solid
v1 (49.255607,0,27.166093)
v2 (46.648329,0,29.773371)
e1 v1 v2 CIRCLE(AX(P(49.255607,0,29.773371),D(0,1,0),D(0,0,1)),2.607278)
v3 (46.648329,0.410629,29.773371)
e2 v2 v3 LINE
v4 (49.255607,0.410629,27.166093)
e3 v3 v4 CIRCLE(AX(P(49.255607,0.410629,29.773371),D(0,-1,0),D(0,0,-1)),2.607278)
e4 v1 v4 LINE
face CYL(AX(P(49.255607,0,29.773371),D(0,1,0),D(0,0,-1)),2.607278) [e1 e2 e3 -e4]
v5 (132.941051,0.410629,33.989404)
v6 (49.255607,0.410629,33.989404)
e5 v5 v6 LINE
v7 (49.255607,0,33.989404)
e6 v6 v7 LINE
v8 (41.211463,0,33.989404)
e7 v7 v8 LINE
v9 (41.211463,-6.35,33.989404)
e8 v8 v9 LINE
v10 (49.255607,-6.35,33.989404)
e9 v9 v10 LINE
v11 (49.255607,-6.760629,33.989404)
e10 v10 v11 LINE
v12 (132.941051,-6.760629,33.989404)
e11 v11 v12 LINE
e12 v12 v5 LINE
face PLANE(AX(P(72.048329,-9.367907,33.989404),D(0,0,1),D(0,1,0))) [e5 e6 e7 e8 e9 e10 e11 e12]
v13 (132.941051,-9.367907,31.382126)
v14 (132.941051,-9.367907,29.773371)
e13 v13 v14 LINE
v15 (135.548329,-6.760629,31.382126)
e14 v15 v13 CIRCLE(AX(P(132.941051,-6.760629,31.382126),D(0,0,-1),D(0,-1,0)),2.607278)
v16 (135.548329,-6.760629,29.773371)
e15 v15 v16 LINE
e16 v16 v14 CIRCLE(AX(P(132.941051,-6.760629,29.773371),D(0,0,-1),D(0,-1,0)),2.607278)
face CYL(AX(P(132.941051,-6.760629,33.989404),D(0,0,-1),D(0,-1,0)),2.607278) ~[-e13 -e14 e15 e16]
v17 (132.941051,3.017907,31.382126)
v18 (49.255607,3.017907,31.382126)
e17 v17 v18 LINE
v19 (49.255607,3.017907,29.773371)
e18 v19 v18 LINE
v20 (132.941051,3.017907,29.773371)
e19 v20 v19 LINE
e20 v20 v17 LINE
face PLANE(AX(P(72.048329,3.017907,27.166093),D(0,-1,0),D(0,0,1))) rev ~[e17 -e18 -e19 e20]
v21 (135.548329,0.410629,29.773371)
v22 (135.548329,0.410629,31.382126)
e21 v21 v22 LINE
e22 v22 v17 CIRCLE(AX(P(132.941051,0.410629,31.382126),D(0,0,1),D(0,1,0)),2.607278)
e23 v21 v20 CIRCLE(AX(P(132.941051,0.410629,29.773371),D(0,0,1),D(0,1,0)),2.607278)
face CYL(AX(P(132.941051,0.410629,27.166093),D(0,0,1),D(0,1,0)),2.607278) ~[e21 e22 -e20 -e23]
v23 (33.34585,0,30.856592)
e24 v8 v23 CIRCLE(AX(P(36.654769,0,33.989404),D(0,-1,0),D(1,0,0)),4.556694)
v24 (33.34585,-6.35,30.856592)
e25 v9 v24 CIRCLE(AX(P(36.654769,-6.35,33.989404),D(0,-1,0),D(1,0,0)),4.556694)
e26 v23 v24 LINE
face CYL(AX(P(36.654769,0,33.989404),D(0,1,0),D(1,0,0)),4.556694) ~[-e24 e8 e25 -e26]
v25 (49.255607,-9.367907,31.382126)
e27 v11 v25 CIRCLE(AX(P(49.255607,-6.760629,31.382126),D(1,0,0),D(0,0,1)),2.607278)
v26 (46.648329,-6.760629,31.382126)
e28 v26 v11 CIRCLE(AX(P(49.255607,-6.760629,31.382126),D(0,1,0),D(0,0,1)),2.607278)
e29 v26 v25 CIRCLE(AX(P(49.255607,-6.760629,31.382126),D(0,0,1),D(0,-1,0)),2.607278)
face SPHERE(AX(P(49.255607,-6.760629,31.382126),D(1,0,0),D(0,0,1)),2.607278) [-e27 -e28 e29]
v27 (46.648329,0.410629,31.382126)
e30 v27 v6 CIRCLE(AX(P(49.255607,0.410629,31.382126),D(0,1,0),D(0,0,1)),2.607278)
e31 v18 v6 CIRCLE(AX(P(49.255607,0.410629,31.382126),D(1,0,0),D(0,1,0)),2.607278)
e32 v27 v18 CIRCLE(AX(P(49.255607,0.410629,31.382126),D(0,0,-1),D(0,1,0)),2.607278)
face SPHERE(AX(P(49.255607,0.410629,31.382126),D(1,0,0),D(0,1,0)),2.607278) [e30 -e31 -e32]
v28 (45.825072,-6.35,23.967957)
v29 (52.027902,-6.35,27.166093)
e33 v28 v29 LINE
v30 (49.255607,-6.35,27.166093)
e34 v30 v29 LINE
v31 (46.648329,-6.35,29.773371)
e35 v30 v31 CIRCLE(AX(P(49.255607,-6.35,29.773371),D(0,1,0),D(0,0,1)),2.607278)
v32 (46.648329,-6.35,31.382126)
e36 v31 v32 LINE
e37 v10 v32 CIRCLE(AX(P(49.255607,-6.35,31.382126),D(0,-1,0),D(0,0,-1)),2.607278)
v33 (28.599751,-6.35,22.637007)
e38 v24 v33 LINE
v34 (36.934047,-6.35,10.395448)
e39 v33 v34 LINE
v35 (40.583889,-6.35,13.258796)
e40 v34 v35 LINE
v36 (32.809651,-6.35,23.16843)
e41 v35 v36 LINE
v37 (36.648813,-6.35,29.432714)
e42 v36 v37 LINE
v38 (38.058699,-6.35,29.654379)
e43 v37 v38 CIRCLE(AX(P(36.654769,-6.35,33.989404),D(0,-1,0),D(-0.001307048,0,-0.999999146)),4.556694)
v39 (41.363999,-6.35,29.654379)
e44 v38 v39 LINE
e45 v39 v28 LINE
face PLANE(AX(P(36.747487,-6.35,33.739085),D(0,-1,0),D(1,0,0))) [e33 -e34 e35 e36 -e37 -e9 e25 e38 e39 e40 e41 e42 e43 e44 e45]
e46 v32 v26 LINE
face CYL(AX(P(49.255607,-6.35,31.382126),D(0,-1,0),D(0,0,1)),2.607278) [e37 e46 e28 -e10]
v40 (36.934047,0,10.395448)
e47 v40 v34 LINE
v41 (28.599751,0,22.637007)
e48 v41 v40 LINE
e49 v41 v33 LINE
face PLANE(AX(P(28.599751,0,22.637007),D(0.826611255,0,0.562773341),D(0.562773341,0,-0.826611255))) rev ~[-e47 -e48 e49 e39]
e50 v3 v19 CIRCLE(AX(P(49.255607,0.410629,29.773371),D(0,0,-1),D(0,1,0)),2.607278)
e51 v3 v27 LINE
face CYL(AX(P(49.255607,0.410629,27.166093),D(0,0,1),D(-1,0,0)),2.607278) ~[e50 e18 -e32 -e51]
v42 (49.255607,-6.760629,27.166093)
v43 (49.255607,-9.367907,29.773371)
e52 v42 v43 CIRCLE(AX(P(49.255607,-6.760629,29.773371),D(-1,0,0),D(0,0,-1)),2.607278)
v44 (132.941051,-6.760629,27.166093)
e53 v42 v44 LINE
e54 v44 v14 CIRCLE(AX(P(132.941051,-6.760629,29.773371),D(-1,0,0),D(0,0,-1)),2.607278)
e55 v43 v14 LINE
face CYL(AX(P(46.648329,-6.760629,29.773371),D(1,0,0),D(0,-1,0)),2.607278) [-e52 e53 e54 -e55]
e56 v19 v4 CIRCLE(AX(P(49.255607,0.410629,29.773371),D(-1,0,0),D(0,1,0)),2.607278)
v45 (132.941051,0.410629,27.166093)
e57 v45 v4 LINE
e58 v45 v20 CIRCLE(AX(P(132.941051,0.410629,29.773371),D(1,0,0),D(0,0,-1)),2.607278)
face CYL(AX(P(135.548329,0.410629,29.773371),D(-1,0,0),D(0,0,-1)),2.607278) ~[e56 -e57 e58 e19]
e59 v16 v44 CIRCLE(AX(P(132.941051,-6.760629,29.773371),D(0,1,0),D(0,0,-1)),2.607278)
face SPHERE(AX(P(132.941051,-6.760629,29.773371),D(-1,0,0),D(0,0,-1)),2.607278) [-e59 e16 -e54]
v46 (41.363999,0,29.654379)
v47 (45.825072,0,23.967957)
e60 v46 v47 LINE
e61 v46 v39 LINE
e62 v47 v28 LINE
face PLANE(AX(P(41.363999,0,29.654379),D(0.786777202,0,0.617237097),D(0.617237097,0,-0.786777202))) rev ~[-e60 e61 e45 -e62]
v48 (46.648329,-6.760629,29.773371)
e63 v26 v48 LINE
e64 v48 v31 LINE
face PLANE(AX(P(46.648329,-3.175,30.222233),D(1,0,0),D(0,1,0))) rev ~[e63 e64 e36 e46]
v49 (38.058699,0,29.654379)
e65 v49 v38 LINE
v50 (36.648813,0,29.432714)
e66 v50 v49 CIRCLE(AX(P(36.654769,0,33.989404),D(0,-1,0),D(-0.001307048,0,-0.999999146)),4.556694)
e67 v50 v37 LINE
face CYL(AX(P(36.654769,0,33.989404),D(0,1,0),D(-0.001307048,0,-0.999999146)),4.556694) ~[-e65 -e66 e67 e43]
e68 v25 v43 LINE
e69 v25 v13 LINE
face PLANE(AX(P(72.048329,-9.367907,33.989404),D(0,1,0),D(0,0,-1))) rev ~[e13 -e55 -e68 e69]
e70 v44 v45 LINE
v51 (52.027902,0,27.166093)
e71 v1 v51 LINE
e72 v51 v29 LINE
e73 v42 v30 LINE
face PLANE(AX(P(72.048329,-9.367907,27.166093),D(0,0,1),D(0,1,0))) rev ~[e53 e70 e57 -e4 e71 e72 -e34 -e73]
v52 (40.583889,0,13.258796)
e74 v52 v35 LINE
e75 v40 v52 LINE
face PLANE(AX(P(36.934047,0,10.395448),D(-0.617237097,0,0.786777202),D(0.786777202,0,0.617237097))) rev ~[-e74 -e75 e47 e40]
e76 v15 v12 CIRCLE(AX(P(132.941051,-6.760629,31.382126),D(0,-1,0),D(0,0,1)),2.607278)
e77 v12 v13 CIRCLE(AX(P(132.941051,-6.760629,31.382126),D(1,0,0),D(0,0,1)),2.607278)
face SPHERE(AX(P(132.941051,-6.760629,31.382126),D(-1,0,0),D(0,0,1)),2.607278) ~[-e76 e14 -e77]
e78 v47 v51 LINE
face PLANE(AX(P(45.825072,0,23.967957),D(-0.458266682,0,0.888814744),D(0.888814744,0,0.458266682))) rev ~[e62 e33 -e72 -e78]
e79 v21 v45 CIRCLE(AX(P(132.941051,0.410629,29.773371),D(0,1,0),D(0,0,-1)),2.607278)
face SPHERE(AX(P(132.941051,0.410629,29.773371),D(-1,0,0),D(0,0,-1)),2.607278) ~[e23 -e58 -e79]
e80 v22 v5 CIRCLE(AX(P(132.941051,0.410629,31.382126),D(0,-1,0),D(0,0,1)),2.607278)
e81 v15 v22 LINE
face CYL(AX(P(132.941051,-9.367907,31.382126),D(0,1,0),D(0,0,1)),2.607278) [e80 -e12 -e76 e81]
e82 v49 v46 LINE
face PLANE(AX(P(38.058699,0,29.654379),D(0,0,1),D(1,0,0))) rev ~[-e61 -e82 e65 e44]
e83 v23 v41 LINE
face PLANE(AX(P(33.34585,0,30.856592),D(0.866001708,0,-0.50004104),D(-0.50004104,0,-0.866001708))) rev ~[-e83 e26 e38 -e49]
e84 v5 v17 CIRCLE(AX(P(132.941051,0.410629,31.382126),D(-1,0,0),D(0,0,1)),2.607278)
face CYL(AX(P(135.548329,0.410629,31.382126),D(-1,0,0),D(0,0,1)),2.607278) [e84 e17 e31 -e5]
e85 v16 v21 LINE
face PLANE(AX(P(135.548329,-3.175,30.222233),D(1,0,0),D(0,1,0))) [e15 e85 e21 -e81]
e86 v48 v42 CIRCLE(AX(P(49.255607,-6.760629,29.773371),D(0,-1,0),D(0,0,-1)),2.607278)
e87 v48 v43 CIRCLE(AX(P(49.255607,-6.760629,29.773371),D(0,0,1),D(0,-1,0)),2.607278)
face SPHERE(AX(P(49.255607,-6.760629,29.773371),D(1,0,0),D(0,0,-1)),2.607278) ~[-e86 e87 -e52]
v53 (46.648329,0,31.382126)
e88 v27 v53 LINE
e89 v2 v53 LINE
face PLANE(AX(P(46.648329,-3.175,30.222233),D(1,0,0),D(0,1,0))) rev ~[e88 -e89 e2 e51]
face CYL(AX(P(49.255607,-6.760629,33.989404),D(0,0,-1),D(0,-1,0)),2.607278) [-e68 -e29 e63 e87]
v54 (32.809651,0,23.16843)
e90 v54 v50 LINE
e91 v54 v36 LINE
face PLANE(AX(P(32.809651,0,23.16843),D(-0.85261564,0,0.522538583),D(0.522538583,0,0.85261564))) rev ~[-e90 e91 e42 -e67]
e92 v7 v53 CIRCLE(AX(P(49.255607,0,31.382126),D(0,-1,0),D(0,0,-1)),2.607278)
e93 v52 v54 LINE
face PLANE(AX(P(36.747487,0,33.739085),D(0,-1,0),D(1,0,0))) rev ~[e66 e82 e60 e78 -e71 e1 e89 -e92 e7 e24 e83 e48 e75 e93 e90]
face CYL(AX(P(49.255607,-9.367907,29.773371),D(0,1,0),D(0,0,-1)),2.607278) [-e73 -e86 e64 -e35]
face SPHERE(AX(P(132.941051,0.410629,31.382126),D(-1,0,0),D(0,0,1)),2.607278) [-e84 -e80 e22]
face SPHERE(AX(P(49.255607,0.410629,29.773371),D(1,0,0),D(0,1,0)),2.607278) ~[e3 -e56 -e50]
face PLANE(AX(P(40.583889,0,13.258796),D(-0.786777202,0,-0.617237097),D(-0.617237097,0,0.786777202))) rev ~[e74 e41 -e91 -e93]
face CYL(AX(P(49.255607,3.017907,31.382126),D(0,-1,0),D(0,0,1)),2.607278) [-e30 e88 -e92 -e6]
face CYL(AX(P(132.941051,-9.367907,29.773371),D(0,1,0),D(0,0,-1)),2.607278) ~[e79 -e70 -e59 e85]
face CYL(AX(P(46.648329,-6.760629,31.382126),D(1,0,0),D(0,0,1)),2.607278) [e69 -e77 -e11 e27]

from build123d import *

# Parameters (mm, degrees)
F1_DEPTH = 6.35
F2_W     = 6.35
F2_H     = 4.3350251792
F3_DEPTH = 25.4
F4_DEPTH = 63.5
F5_R     = 2.607278221


# Not quite as in the source:
# - a feature names something its author has since deleted; it is built from what else it names


with BuildPart() as f1:
    # F0 (on Front) → F1 (new body)
    with BuildSketch(Plane.XZ):
        with BuildLine():
            ThreePointArc((38.0586988364, 29.6543792382), (40.3399245407, 31.3092753383), (41.2114633723, 33.9894044175))
            ThreePointArc((41.2114633723, 33.9894044175), (34.9686895654, 38.2226770455), (33.345850058, 30.8565916617))
            ThreePointArc((33.345850058, 30.8565916617), (34.8508967595, 29.8049682674), (36.6488133888, 29.4327141456))
            ThreePointArc((36.6488133888, 29.4327141456), (37.3624884645, 29.4880051728), (38.0586988364, 29.6543792382))
        make_face()
        with BuildLine():
            ThreePointArc((36.6488133888, 29.4327141456), (34.8508967595, 29.8049682674), (33.345850058, 30.8565916617))
            Line((33.345850058, 30.8565916617), (28.5997511098, 22.6370067444))
            Line((28.5997511098, 22.6370067444), (36.9340473419, 10.395447725))
            Line((36.9340473419, 10.395447725), (40.5838886152, 13.2587963652))
            Line((40.5838886152, 13.2587963652), (32.8096505039, 23.1684296974))
            Line((32.8096505039, 23.1684296974), (36.6488133888, 29.4327141456))
        make_face()
        Polygon((56.8539685432, 29.6543792382), (41.3639992476, 29.6543792382), (45.8250723122, 23.9679572756), align=None)
        with BuildLine():
            Line((72.0483290742, 33.9894044175), (41.2114633723, 33.9894044175))
            ThreePointArc((41.2114633723, 33.9894044175), (40.3399245407, 31.3092753383), (38.0586988364, 29.6543792382))
            Line((38.0586988364, 29.6543792382), (41.3639992476, 29.6543792382))
            Line((41.3639992476, 29.6543792382), (56.8539685432, 29.6543792382))
            Line((56.8539685432, 29.6543792382), (72.0483290742, 29.6543792382))
            Line((72.0483290742, 29.6543792382), (72.0483290742, 33.9894044175))
        make_face()
    extrude(amount=F1_DEPTH)

    # F2 (on face) → F3 (join)
    with BuildSketch(Plane.YZ.offset(72.0483290742)):
        Polygon((-6.35, 29.6543792382), (-6.35, 33.9894044175), (-9.3679074198, 33.9894044175), (-9.3679074198, 27.1660927683), (3.0179074198, 27.1660927683), (3.0179074198, 33.9894044175), (0, 33.9894044175), (0, 29.6543792382), align=None)
        with Locations((-3.175, 31.8218918279)):
            Rectangle(F2_W, F2_H)
    extrude(amount=-F3_DEPTH)

    # F4 (add): a face of the model
    f4_faces = [f1.faces().sort_by_distance(p)[0] for p in [
        (72.0483290742, -3.175, 30.5777485929),
    ]]
    extrude(f4_faces, amount=F4_DEPTH)

    # F5
    f5_edges = [f1.edges().sort_by_distance(p)[0] for p in [
        (91.098329, 3.017907, 33.989404),
        (91.098329, 3.017907, 27.166093),
        (91.098329, -9.367907, 27.166093),
        (91.098329, -9.367907, 33.989404),
        (135.548329, -3.175, 33.989404),
        (135.548329, -3.175, 27.166093),
        (135.548329, -9.367907, 30.577749),
        (135.548329, 3.017907, 30.577749),
        (46.648329, 3.017907, 30.577749),
        (46.648329, 1.508954, 33.989404),
        (46.648329, 1.508954, 27.166093),
        (46.648329, -7.858954, 33.989404),
        (46.648329, -7.858954, 27.166093),
        (46.648329, -9.367907, 30.577749),
    ]]
    fillet(f5_edges, radius=F5_R)


solid = f1.part
